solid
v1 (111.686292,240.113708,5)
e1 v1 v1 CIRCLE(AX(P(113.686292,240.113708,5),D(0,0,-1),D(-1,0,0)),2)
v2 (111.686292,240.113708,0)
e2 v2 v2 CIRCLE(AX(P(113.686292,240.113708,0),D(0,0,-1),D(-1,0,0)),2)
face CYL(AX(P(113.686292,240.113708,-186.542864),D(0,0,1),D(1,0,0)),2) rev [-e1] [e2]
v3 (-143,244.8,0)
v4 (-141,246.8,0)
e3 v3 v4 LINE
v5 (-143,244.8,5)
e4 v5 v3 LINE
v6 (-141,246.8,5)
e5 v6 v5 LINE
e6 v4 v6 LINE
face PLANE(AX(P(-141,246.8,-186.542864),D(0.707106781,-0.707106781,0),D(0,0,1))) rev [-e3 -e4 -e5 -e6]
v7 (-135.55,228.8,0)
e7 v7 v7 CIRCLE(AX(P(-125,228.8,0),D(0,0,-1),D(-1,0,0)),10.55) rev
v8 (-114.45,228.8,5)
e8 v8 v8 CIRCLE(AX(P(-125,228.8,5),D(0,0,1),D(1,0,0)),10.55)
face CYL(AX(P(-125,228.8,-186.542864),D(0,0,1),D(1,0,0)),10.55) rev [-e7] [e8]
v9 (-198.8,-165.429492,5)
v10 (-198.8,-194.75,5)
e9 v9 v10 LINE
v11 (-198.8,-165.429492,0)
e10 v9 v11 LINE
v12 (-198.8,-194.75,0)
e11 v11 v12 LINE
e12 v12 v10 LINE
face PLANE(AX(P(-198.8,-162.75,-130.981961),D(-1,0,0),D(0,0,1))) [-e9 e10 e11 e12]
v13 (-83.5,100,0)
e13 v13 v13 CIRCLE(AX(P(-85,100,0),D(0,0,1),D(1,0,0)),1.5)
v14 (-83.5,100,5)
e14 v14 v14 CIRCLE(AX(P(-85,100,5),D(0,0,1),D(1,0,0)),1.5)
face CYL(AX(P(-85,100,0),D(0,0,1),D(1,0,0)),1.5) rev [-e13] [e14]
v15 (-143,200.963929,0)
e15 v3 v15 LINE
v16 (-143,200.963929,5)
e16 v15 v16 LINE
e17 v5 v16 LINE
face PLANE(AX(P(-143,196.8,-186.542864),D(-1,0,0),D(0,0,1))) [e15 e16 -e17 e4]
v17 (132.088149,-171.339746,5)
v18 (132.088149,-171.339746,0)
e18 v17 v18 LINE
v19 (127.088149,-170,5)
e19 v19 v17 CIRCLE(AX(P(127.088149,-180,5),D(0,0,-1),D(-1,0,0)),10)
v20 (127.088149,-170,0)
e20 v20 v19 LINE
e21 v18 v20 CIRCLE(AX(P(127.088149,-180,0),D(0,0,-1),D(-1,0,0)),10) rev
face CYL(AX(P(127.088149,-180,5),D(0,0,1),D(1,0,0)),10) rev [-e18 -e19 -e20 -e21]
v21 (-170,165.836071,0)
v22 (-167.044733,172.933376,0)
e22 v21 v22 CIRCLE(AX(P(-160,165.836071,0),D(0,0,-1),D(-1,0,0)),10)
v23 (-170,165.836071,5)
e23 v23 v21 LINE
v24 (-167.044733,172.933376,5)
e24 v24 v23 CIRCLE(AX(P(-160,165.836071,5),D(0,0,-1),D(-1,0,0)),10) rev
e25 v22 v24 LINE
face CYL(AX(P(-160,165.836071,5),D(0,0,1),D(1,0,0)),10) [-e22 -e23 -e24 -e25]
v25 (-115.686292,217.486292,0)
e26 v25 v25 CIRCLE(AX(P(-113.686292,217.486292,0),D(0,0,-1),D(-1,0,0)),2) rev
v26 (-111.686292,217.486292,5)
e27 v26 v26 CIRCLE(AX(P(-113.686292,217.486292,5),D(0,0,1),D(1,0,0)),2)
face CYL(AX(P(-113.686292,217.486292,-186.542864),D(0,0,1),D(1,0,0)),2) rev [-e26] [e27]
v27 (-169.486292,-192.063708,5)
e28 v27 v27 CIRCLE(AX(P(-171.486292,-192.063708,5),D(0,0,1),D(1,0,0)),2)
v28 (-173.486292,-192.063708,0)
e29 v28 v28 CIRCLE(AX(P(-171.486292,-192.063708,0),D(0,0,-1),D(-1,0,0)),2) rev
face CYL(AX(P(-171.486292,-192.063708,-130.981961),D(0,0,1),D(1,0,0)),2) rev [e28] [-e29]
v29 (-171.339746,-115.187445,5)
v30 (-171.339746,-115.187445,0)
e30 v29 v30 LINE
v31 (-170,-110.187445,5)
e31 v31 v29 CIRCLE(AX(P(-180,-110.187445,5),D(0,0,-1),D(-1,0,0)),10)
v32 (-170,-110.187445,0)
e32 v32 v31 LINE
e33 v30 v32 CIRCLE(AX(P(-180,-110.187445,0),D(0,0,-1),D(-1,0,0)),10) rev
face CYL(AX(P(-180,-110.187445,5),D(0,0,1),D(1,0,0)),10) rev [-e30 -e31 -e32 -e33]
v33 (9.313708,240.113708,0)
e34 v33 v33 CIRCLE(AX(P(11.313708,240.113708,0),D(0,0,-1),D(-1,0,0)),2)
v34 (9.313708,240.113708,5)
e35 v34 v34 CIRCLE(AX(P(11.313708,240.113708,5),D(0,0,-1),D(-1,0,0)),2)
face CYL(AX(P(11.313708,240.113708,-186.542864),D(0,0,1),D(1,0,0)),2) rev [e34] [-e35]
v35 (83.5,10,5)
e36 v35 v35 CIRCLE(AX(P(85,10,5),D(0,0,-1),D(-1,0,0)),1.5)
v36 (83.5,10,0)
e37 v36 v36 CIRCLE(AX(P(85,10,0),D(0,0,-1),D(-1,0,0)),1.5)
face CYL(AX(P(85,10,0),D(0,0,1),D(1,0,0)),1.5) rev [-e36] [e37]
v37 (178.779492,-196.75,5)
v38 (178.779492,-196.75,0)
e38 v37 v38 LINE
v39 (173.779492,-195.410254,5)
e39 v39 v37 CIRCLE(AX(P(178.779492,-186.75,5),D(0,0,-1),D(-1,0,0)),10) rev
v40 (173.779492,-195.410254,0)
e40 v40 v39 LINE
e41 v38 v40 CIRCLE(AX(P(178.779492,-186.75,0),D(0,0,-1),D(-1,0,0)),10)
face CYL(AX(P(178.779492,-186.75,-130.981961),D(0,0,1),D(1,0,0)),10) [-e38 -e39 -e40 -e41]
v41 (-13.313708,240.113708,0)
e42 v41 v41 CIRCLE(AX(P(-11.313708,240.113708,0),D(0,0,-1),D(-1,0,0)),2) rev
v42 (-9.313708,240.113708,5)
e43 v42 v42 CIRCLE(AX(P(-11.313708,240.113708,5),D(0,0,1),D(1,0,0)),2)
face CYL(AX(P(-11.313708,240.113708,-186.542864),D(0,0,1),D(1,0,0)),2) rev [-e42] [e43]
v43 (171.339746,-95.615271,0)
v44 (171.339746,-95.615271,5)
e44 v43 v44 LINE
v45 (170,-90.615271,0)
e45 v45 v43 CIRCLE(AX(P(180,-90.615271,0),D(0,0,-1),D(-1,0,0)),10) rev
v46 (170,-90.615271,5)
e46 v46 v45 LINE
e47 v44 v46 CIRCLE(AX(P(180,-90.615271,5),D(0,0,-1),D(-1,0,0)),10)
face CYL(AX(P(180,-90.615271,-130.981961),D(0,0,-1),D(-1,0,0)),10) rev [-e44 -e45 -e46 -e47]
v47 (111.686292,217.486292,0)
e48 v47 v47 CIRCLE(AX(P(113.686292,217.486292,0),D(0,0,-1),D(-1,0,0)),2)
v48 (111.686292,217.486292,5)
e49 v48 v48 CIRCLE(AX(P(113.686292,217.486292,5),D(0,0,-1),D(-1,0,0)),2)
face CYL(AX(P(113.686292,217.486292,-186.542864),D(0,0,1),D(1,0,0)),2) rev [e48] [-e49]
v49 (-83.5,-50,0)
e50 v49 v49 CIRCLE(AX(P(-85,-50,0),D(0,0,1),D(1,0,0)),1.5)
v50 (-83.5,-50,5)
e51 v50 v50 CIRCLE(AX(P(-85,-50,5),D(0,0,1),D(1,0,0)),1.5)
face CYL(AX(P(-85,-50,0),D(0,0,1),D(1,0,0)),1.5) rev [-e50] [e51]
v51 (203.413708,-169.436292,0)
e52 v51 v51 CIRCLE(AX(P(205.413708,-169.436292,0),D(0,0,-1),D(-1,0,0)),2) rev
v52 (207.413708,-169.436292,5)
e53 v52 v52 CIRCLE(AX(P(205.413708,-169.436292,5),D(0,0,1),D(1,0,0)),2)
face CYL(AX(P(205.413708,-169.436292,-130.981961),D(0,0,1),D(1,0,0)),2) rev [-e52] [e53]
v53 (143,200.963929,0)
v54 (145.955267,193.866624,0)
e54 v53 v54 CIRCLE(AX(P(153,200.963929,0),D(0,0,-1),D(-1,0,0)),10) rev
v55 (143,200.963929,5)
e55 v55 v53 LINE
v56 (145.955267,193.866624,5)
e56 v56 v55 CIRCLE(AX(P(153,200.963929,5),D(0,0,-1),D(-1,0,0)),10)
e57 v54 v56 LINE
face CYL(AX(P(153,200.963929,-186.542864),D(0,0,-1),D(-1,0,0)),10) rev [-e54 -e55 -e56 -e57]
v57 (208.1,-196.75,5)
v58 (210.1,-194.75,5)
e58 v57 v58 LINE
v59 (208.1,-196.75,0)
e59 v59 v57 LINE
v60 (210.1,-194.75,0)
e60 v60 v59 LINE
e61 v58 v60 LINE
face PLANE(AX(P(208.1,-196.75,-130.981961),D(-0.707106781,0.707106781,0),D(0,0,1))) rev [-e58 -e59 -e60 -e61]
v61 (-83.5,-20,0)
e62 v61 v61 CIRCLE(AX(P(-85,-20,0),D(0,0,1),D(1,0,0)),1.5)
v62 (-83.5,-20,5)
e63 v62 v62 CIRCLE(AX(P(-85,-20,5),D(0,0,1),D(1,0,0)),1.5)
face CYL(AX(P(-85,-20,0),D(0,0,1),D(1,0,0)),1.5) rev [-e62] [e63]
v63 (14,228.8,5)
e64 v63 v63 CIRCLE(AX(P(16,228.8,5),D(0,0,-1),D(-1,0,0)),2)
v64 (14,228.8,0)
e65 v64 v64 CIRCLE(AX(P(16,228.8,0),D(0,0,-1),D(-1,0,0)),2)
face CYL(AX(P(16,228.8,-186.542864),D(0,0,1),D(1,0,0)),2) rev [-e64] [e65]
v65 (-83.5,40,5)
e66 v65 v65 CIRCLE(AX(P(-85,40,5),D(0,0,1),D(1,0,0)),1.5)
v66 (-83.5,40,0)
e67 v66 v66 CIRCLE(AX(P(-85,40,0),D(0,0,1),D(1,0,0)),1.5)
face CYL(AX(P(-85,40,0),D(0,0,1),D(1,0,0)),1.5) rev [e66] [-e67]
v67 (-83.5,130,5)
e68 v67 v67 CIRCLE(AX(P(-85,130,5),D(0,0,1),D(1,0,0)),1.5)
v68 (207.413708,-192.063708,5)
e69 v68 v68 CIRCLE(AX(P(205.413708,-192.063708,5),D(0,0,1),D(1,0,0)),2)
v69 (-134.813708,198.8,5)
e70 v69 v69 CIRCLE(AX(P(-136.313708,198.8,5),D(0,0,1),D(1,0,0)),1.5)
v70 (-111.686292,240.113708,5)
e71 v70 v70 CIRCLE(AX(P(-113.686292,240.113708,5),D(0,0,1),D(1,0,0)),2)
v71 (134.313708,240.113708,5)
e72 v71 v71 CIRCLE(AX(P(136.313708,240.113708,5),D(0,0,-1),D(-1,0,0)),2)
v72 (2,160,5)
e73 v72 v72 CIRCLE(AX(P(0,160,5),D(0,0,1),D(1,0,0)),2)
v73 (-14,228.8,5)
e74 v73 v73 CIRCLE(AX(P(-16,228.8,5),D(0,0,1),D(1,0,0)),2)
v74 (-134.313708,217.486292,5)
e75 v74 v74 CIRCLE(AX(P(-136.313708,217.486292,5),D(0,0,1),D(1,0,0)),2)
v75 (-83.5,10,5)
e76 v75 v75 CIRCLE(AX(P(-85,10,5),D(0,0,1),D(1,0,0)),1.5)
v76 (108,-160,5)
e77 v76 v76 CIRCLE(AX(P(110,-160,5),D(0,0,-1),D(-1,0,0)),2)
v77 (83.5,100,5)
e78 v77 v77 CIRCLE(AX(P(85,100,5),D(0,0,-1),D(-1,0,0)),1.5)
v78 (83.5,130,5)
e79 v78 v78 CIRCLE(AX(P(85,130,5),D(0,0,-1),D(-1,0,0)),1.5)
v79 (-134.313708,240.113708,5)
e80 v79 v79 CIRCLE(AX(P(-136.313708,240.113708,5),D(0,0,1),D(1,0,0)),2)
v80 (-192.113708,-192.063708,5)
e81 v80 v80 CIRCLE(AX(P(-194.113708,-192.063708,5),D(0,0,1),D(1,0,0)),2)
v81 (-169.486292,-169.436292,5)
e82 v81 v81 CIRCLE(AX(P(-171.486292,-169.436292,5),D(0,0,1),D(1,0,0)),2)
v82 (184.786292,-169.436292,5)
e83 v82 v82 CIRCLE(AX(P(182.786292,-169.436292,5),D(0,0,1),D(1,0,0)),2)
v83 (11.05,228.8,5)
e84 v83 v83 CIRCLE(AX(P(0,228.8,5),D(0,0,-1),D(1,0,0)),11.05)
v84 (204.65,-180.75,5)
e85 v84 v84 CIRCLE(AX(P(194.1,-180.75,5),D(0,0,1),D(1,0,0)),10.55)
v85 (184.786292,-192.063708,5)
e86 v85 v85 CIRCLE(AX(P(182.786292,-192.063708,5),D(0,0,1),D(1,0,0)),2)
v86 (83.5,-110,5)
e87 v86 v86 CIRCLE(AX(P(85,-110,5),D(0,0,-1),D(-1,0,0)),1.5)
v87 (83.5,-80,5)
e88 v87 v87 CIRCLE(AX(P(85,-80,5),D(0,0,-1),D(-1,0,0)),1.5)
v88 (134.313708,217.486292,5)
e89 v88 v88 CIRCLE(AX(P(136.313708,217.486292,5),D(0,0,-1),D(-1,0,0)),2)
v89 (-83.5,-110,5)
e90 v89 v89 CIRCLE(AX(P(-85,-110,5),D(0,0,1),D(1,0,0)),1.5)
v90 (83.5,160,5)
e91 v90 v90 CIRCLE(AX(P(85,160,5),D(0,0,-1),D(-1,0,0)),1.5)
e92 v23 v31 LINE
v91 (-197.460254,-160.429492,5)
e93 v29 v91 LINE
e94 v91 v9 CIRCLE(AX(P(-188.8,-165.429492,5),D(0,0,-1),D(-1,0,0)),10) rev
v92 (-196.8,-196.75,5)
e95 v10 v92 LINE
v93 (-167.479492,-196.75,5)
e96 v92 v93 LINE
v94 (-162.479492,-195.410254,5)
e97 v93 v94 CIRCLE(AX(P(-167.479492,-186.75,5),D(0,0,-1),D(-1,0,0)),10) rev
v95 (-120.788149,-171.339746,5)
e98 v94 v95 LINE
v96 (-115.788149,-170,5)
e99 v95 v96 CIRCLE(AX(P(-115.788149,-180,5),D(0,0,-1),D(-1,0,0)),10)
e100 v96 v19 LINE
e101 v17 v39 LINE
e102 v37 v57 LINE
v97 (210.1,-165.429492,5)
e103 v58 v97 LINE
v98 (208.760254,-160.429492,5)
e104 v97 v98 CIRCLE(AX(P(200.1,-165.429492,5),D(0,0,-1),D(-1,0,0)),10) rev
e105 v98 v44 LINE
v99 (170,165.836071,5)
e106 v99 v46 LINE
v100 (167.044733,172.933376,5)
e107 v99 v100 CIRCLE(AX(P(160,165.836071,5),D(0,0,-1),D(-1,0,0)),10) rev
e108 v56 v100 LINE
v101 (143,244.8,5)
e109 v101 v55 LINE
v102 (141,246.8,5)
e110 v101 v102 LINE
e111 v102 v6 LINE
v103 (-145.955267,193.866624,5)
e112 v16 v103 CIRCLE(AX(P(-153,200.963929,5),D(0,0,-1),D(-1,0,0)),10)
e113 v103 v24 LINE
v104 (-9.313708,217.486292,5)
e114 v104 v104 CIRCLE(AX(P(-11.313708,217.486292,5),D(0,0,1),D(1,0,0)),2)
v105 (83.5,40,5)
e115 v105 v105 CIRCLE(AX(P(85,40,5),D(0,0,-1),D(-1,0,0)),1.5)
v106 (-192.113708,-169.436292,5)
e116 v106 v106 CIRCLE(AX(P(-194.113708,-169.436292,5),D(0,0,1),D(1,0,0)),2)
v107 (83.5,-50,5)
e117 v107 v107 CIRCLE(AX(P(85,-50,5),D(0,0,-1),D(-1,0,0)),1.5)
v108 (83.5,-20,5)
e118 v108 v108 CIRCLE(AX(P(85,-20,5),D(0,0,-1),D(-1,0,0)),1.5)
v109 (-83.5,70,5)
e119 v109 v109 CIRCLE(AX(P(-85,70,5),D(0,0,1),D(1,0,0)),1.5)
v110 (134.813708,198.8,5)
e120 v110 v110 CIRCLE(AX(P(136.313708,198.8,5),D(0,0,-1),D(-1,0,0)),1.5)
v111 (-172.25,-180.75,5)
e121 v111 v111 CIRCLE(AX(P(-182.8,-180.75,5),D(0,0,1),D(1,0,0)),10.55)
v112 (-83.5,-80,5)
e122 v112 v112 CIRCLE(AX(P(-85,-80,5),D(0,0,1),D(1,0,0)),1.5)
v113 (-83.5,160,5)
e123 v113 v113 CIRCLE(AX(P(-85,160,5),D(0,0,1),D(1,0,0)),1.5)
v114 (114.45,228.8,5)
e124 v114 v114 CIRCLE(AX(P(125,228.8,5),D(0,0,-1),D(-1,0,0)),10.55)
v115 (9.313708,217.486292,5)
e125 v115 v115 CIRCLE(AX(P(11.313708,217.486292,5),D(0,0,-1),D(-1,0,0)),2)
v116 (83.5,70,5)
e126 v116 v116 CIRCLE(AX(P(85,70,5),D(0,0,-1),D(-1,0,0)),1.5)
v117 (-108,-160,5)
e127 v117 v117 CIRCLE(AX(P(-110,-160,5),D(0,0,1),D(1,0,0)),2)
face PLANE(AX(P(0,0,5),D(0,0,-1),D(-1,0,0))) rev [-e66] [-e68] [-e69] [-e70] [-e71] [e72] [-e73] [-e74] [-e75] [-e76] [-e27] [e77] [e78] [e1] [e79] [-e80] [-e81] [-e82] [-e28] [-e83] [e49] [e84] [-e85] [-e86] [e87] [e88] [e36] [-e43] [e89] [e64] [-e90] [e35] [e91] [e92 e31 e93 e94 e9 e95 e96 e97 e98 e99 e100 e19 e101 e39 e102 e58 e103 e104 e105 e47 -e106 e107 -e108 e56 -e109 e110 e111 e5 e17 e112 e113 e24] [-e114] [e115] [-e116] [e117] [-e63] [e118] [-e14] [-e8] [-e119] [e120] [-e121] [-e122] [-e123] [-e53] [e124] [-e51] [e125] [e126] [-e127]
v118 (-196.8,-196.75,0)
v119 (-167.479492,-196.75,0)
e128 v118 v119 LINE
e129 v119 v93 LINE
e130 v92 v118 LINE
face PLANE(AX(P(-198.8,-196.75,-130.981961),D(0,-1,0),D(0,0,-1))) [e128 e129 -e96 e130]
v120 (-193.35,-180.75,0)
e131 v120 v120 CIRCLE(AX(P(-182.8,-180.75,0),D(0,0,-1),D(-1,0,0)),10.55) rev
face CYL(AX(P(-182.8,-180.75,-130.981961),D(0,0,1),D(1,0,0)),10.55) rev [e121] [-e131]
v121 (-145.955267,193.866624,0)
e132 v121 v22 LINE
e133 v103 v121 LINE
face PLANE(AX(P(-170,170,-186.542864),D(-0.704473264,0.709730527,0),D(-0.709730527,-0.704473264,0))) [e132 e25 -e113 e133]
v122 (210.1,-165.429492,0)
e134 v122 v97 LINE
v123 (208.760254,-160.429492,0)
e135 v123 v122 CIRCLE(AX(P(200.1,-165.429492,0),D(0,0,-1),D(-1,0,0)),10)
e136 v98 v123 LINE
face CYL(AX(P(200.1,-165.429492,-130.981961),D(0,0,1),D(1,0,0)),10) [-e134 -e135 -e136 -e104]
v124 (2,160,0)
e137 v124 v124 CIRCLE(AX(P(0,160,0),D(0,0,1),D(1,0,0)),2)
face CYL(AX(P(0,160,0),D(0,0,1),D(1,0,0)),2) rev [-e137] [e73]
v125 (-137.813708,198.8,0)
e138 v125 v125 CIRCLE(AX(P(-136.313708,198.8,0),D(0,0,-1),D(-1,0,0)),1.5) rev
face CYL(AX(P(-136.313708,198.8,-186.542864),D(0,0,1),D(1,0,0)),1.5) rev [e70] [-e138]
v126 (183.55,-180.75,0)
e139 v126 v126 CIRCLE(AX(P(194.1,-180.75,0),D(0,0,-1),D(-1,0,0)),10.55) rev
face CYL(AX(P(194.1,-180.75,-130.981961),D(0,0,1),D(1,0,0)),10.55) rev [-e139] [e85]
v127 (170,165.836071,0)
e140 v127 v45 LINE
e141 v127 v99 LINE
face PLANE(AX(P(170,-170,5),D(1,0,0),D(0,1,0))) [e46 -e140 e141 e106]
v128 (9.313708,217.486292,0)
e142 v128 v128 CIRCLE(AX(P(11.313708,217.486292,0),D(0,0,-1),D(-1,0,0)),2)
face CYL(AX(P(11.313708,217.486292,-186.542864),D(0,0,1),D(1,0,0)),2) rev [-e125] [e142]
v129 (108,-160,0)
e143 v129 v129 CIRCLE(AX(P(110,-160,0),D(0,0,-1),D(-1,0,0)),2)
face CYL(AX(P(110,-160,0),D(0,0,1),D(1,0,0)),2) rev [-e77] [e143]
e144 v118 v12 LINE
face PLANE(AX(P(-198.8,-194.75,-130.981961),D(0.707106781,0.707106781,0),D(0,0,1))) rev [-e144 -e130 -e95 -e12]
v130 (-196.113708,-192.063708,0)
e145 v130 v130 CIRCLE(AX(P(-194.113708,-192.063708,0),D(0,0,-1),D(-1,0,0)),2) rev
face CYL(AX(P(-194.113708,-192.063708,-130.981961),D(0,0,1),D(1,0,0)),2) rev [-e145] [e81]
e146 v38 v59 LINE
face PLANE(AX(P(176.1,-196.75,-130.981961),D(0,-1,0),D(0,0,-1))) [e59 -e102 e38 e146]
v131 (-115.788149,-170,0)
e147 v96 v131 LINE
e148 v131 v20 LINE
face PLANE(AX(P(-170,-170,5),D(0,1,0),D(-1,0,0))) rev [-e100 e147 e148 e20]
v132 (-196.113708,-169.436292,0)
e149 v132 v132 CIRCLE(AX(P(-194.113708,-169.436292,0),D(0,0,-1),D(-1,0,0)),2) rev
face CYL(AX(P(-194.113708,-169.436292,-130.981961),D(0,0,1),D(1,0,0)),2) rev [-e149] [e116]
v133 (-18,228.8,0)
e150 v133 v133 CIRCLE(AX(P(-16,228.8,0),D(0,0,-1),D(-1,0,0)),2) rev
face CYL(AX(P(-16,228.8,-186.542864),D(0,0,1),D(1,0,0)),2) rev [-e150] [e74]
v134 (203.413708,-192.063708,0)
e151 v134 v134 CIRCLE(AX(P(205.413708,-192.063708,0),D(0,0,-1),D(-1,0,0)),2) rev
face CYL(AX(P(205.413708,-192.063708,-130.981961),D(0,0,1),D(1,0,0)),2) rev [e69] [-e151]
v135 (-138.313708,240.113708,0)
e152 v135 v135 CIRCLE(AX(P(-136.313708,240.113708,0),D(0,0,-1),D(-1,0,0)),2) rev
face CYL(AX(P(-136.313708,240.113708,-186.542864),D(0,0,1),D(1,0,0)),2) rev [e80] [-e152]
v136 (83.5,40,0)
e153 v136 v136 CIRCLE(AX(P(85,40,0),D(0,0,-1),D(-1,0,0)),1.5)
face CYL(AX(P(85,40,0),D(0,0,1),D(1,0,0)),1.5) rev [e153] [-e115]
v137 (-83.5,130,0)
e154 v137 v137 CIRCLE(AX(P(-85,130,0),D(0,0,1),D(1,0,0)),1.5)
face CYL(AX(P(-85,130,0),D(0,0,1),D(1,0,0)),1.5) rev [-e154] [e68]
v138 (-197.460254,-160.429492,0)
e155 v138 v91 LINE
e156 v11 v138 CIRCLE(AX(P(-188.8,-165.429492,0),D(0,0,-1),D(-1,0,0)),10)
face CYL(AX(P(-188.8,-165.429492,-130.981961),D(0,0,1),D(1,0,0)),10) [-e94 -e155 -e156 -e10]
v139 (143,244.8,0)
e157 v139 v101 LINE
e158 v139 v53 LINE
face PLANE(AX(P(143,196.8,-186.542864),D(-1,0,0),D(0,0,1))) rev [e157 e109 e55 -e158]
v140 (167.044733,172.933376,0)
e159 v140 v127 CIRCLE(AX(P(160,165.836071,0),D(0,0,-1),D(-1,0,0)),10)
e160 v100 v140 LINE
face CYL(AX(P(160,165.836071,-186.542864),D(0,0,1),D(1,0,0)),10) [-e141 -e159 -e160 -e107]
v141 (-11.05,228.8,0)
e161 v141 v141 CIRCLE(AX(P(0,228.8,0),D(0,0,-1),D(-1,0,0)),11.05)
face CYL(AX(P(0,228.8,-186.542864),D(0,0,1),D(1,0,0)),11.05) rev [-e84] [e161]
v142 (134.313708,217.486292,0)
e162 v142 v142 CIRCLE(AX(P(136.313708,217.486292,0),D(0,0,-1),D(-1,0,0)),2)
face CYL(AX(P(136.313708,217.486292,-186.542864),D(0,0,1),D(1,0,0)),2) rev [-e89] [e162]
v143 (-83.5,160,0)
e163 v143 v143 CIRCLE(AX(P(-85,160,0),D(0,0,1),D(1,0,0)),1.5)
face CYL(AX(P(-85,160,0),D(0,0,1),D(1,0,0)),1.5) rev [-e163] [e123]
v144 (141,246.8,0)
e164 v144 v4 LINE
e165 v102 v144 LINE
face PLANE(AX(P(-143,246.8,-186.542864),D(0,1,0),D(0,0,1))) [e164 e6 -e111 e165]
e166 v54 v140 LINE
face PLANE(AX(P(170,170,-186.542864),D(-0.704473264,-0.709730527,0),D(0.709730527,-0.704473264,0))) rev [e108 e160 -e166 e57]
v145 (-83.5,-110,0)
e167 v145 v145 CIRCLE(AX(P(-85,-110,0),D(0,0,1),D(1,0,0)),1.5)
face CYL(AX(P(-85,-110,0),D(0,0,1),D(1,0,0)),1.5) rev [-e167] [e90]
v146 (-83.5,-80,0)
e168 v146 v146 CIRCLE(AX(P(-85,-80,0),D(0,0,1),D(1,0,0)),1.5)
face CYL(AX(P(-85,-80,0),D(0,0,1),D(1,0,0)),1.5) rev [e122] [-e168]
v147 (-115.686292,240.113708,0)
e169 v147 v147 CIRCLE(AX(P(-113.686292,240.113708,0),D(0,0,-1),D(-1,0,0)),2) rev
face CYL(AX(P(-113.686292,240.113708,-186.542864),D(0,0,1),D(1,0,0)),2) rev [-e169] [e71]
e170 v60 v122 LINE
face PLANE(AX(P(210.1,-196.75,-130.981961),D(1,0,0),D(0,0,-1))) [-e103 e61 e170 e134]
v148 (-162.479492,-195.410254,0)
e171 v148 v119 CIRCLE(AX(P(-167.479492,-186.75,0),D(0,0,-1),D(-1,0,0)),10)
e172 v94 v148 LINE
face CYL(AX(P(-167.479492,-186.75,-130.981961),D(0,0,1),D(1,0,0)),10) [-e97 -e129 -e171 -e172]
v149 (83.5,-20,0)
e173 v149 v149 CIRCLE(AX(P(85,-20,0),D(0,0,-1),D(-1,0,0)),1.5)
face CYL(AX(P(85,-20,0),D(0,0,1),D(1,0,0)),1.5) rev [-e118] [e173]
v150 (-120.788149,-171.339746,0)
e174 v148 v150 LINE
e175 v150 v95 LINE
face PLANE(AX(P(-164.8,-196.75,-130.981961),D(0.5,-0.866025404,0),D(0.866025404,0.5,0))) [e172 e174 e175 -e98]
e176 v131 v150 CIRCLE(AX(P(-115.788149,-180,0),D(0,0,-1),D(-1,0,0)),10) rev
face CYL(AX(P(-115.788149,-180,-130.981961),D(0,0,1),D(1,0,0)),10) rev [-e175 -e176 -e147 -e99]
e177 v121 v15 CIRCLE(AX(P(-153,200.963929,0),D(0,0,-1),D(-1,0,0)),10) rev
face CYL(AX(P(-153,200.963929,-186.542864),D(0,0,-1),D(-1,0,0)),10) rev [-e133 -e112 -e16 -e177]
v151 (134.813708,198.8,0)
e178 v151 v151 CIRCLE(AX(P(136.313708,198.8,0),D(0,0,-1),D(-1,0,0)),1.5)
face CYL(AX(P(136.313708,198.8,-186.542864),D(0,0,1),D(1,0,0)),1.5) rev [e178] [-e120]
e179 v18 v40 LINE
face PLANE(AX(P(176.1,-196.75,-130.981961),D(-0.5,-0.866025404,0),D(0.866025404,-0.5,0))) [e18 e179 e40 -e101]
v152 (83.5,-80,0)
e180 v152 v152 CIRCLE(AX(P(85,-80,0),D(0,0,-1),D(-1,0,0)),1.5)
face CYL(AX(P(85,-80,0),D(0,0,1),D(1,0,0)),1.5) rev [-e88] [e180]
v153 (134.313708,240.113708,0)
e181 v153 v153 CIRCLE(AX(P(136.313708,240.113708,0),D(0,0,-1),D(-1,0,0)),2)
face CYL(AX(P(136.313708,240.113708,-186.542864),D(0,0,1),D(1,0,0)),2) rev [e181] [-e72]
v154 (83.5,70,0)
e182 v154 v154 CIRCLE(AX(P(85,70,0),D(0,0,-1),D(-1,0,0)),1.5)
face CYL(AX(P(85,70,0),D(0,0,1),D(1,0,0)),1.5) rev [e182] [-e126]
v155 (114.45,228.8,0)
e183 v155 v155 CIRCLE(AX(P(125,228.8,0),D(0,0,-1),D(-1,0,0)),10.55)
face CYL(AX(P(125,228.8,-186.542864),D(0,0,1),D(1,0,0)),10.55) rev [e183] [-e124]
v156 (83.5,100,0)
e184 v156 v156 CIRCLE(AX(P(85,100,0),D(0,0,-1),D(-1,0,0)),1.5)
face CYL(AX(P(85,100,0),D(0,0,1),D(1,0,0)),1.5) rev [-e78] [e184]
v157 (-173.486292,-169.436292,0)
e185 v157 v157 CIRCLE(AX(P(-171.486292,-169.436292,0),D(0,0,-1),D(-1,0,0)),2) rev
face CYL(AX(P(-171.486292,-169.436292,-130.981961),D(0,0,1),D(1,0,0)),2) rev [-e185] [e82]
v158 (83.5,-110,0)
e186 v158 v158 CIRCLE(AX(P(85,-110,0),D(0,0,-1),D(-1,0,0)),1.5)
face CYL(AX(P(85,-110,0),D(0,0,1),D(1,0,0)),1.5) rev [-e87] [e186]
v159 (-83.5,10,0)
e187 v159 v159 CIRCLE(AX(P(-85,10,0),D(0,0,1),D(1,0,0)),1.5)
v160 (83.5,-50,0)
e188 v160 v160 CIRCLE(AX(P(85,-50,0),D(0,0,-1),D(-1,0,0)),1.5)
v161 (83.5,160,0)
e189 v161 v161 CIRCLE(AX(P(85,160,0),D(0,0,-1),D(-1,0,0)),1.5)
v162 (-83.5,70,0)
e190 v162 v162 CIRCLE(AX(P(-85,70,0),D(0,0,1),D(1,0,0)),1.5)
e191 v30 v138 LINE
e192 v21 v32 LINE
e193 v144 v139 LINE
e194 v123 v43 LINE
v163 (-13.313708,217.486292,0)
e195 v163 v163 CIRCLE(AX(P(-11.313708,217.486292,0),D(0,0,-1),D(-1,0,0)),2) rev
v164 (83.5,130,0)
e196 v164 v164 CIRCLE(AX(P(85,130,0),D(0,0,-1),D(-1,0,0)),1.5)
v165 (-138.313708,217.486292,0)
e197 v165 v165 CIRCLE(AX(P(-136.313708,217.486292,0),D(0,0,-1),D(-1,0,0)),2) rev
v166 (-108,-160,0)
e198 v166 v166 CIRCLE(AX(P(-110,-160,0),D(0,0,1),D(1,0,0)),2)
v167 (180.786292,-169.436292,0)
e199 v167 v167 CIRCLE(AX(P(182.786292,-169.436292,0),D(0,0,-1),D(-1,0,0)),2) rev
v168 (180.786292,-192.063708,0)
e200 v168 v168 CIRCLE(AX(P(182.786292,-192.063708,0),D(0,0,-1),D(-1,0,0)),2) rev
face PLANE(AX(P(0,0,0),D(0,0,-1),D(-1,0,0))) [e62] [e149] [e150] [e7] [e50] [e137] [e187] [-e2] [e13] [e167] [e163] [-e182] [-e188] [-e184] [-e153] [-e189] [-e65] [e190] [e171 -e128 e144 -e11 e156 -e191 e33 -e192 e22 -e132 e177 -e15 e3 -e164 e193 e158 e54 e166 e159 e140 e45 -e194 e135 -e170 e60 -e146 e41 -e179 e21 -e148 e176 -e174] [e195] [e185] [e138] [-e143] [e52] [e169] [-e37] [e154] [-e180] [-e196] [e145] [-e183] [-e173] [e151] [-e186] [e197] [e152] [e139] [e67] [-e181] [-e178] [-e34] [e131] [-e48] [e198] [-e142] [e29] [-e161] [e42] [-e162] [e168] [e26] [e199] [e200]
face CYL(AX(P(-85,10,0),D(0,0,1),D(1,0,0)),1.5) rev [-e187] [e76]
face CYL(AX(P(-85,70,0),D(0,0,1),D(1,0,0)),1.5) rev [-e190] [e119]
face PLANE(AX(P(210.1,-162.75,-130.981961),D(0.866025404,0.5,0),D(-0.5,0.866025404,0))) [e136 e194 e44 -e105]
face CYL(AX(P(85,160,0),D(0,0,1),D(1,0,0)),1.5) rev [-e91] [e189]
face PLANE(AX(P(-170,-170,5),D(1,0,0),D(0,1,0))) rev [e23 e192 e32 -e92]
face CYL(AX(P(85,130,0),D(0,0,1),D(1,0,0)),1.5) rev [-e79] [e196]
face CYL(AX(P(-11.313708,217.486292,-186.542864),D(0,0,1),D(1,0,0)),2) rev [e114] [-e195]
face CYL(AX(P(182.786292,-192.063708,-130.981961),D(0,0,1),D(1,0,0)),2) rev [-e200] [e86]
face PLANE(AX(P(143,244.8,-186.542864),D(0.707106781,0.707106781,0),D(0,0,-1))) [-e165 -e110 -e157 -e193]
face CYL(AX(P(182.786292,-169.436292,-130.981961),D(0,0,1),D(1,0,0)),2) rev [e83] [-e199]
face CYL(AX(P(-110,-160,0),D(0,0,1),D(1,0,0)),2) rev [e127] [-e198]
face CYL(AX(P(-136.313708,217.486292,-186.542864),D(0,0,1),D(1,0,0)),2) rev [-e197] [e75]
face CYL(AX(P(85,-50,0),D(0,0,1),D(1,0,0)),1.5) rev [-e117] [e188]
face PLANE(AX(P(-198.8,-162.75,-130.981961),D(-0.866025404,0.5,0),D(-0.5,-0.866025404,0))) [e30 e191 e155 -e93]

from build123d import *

# Parameters (mm, degrees)
SKETCH1_W           = 170
SKETCH1_H           = 340
BOSS_EXTRUDE1_DEPTH = 5
SKETCH2_R           = 2
CUT_EXTRUDE1_DEPTH  = 241.468293128
SKETCH3_R           = 2
SKETCH3_R_2         = 10.55
SKETCH3_R_3         = 1.5
BOSS_EXTRUDE2_DEPTH = 5
CHAMFER3_SIZE       = 5
FILLET1_R           = 10
CHAMFER2_SIZE       = 2
MIRROR2_OUTLINE_R   = 2
MIRROR2_OUTLINE_R_2 = 1.5
MIRROR2_OUTLINE_R_3 = 10.55
MIRROR2_DEPTH       = 5
SKETCH5_R           = 10.55
SKETCH5_R_2         = 2
BOSS_EXTRUDE3_DEPTH = 5
CHAMFER4_SIZE       = 2
FILLET2_R           = 10
SKETCH4_R           = 1.5
CUT_EXTRUDE2_DEPTH  = 325.156212342


# Read off the part's stored shape, not the designer's step: Mirror2
with BuildPart() as part:
    # Sketch1 → Boss-Extrude1 (new body)
    with BuildSketch(Plane.XY):
        with Locations((-85, 0)):
            Rectangle(SKETCH1_W, SKETCH1_H)
    extrude(amount=BOSS_EXTRUDE1_DEPTH)

    # Sketch2 → Cut-Extrude1 (cut, through all)
    with BuildSketch(Plane.XY.offset(5)):
        with Locations((-110, -160)):
            Circle(SKETCH2_R)
        with Locations((0, 160)):
            Circle(SKETCH2_R)
    extrude(amount=-CUT_EXTRUDE1_DEPTH, mode=Mode.SUBTRACT)

    # Sketch3 → Boss-Extrude2 (add)
    with BuildSketch(Plane.XY.offset(5)):
        with BuildLine():
            Line((-170, 170), (-143, 196.8))
            Line((-143, 196.8), (-143, 246.8))
            Line((-143, 246.8), (0, 246.8))
            Line((0, 246.8), (0, 239.85))
            ThreePointArc((0, 239.85), (-11.05, 228.8), (0, 217.75))
            Line((0, 217.75), (0, 170))
            Line((0, 170), (-170, 170))
        make_face()
        with Locations((-11.313708499, 240.113708499)):
            Circle(SKETCH3_R, mode=Mode.SUBTRACT)
        with Locations((-11.313708499, 217.486291501)):
            Circle(SKETCH3_R, mode=Mode.SUBTRACT)
        with Locations((-16, 228.8)):
            Circle(SKETCH3_R, mode=Mode.SUBTRACT)
        with Locations((-125, 228.8)):
            Circle(SKETCH3_R_2, mode=Mode.SUBTRACT)
        with Locations((-136.313708499, 240.113708499)):
            Circle(SKETCH3_R, mode=Mode.SUBTRACT)
        with Locations((-113.686291501, 240.113708499)):
            Circle(SKETCH3_R, mode=Mode.SUBTRACT)
        with Locations((-136.313708499, 217.486291501)):
            Circle(SKETCH3_R, mode=Mode.SUBTRACT)
        with Locations((-113.686291501, 217.486291501)):
            Circle(SKETCH3_R, mode=Mode.SUBTRACT)
        with Locations((-136.313708499, 198.8)):
            Circle(SKETCH3_R_3, mode=Mode.SUBTRACT)
    extrude(amount=-BOSS_EXTRUDE2_DEPTH)

    # Chamfer3
    chamfer3_edges = [part.edges().sort_by_distance(p)[0] for p in [
        (-170, -170, 2.5),
    ]]
    chamfer(chamfer3_edges, length=CHAMFER3_SIZE)

    # Fillet1
    fillet1_edges = [part.edges().sort_by_distance(p)[0] for p in [
        (-143, 196.8, 2.5),
        (-170, 170, 2.5),
    ]]
    fillet(fillet1_edges, radius=FILLET1_R)

    # Chamfer2
    chamfer2_edges = [part.edges().sort_by_distance(p)[0] for p in [
        (-143, 246.8, 2.5),
    ]]
    chamfer(chamfer2_edges, length=CHAMFER2_SIZE)

    # Mirror2 outline → Mirror2 (add)
    with BuildSketch(Plane.XY):
        with BuildLine():
            Line((0, -170), (165, -170))
            Line((165, -170), (170, -165))
            Line((170, -165), (170, 165.836071225))
            ThreePointArc((170, 165.836071225), (169.231666328, 169.680071331), (167.044732637, 172.933376494))
            Line((167.044732637, 172.933376494), (145.955267363, 193.866623506))
            ThreePointArc((145.955267363, 193.866623506), (143.768333672, 197.119928669), (143, 200.963928775))
            Line((143, 200.963928775), (143, 244.8))
            Line((143, 244.8), (141, 246.8))
            Line((141, 246.8), (0, 246.8))
            Line((0, 246.8), (0, 239.85))
            ThreePointArc((0, 239.85), (11.05, 228.8), (0, 217.75))
            Line((0, 217.75), (0, 162))
            ThreePointArc((0, 162), (2, 160), (0, 158))
            Line((0, 158), (0, -170))
        make_face()
        with Locations((110, -160)):
            Circle(MIRROR2_OUTLINE_R, mode=Mode.SUBTRACT)
        with Locations((11.313708499, 217.486291501)):
            Circle(MIRROR2_OUTLINE_R, mode=Mode.SUBTRACT)
        with Locations((11.313708499, 240.113708499)):
            Circle(MIRROR2_OUTLINE_R, mode=Mode.SUBTRACT)
        with Locations((16, 228.8)):
            Circle(MIRROR2_OUTLINE_R, mode=Mode.SUBTRACT)
        with Locations((113.686291501, 217.486291501)):
            Circle(MIRROR2_OUTLINE_R, mode=Mode.SUBTRACT)
        with Locations((113.686291501, 240.113708499)):
            Circle(MIRROR2_OUTLINE_R, mode=Mode.SUBTRACT)
        with Locations((136.313708499, 198.8)):
            Circle(MIRROR2_OUTLINE_R_2, mode=Mode.SUBTRACT)
        with Locations((136.313708499, 217.486291501)):
            Circle(MIRROR2_OUTLINE_R, mode=Mode.SUBTRACT)
        with Locations((125, 228.8)):
            Circle(MIRROR2_OUTLINE_R_3, mode=Mode.SUBTRACT)
        with Locations((136.313708499, 240.113708499)):
            Circle(MIRROR2_OUTLINE_R, mode=Mode.SUBTRACT)
    extrude(amount=MIRROR2_DEPTH)

    # Sketch5 → Boss-Extrude3 (add)
    # profile 1 of 2: a face of its own
    with BuildSketch(Plane.XY.offset(5)):
        Polygon((-198.8, -162.75), (-198.8, -196.75), (-164.8, -196.75), (-118.467640898, -170), (-170, -112.866936742), align=None)
        with Locations((-182.8, -180.75)):
            Circle(SKETCH5_R, mode=Mode.SUBTRACT)
        with Locations((-194.113708499, -169.436291501)):
            Circle(SKETCH5_R_2, mode=Mode.SUBTRACT)
        with Locations((-171.486291501, -169.436291501)):
            Circle(SKETCH5_R_2, mode=Mode.SUBTRACT)
        with Locations((-171.486291501, -192.063708499)):
            Circle(SKETCH5_R_2, mode=Mode.SUBTRACT)
        with Locations((-194.113708499, -192.063708499)):
            Circle(SKETCH5_R_2, mode=Mode.SUBTRACT)
    # profile 2 of 2: a face of its own
    with BuildSketch(Plane.XY.offset(5)):
        Polygon((176.1, -196.75), (210.1, -196.75), (210.1, -162.75), (170, -93.294762616), (129.767640898, -170), align=None)
        with Locations((194.1, -180.75)):
            Circle(SKETCH5_R, mode=Mode.SUBTRACT)
        with Locations((205.413708499, -192.063708499)):
            Circle(SKETCH5_R_2, mode=Mode.SUBTRACT)
        with Locations((205.413708499, -169.436291501)):
            Circle(SKETCH5_R_2, mode=Mode.SUBTRACT)
        with Locations((182.786291501, -169.436291501)):
            Circle(SKETCH5_R_2, mode=Mode.SUBTRACT)
        with Locations((182.786291501, -192.063708499)):
            Circle(SKETCH5_R_2, mode=Mode.SUBTRACT)
    extrude(amount=-BOSS_EXTRUDE3_DEPTH)

    # Chamfer4
    chamfer4_edges = [part.edges().sort_by_distance(p)[0] for p in [
        (-198.8, -196.75, 2.5),
        (210.1, -196.75, 2.5),
    ]]
    chamfer(chamfer4_edges, length=CHAMFER4_SIZE)

    # Fillet2
    fillet2_edges = [part.edges().sort_by_distance(p)[0] for p in [
        (-198.8, -162.75, 2.5),
        (-170, -112.866936742, 2.5),
        (-118.467640898, -170, 2.5),
        (-164.8, -196.75, 2.5),
        (176.1, -196.75, 2.5),
        (129.767640898, -170, 2.5),
        (170, -93.294762616, 2.5),
        (210.1, -162.75, 2.5),
    ]]
    fillet(fillet2_edges, radius=FILLET2_R)

    # Sketch4 → Cut-Extrude2 (cut, through all)
    with BuildSketch(Plane.XY.offset(5)):
        with Locations((-85, 160)):
            Circle(SKETCH4_R)
        with Locations((-85, 130)):
            Circle(SKETCH4_R)
        with Locations((-85, 100)):
            Circle(SKETCH4_R)
        with Locations((-85, 70)):
            Circle(SKETCH4_R)
        with Locations((-85, 40)):
            Circle(SKETCH4_R)
        with Locations((-85, 10)):
            Circle(SKETCH4_R)
        with Locations((-85, -20)):
            Circle(SKETCH4_R)
        with Locations((-85, -50)):
            Circle(SKETCH4_R)
        with Locations((-85, -80)):
            Circle(SKETCH4_R)
        with Locations((-85, -110)):
            Circle(SKETCH4_R)
    cut_extrude2 = extrude(amount=-CUT_EXTRUDE2_DEPTH, mode=Mode.SUBTRACT)

    # Mirror3: Cut-Extrude2 across plane
    add(cut_extrude2.mirror(Plane(origin=(0, 0, 0), x_dir=(0, 0, 1), z_dir=(1, 0, 0))), mode=Mode.SUBTRACT)


solid = part.part
